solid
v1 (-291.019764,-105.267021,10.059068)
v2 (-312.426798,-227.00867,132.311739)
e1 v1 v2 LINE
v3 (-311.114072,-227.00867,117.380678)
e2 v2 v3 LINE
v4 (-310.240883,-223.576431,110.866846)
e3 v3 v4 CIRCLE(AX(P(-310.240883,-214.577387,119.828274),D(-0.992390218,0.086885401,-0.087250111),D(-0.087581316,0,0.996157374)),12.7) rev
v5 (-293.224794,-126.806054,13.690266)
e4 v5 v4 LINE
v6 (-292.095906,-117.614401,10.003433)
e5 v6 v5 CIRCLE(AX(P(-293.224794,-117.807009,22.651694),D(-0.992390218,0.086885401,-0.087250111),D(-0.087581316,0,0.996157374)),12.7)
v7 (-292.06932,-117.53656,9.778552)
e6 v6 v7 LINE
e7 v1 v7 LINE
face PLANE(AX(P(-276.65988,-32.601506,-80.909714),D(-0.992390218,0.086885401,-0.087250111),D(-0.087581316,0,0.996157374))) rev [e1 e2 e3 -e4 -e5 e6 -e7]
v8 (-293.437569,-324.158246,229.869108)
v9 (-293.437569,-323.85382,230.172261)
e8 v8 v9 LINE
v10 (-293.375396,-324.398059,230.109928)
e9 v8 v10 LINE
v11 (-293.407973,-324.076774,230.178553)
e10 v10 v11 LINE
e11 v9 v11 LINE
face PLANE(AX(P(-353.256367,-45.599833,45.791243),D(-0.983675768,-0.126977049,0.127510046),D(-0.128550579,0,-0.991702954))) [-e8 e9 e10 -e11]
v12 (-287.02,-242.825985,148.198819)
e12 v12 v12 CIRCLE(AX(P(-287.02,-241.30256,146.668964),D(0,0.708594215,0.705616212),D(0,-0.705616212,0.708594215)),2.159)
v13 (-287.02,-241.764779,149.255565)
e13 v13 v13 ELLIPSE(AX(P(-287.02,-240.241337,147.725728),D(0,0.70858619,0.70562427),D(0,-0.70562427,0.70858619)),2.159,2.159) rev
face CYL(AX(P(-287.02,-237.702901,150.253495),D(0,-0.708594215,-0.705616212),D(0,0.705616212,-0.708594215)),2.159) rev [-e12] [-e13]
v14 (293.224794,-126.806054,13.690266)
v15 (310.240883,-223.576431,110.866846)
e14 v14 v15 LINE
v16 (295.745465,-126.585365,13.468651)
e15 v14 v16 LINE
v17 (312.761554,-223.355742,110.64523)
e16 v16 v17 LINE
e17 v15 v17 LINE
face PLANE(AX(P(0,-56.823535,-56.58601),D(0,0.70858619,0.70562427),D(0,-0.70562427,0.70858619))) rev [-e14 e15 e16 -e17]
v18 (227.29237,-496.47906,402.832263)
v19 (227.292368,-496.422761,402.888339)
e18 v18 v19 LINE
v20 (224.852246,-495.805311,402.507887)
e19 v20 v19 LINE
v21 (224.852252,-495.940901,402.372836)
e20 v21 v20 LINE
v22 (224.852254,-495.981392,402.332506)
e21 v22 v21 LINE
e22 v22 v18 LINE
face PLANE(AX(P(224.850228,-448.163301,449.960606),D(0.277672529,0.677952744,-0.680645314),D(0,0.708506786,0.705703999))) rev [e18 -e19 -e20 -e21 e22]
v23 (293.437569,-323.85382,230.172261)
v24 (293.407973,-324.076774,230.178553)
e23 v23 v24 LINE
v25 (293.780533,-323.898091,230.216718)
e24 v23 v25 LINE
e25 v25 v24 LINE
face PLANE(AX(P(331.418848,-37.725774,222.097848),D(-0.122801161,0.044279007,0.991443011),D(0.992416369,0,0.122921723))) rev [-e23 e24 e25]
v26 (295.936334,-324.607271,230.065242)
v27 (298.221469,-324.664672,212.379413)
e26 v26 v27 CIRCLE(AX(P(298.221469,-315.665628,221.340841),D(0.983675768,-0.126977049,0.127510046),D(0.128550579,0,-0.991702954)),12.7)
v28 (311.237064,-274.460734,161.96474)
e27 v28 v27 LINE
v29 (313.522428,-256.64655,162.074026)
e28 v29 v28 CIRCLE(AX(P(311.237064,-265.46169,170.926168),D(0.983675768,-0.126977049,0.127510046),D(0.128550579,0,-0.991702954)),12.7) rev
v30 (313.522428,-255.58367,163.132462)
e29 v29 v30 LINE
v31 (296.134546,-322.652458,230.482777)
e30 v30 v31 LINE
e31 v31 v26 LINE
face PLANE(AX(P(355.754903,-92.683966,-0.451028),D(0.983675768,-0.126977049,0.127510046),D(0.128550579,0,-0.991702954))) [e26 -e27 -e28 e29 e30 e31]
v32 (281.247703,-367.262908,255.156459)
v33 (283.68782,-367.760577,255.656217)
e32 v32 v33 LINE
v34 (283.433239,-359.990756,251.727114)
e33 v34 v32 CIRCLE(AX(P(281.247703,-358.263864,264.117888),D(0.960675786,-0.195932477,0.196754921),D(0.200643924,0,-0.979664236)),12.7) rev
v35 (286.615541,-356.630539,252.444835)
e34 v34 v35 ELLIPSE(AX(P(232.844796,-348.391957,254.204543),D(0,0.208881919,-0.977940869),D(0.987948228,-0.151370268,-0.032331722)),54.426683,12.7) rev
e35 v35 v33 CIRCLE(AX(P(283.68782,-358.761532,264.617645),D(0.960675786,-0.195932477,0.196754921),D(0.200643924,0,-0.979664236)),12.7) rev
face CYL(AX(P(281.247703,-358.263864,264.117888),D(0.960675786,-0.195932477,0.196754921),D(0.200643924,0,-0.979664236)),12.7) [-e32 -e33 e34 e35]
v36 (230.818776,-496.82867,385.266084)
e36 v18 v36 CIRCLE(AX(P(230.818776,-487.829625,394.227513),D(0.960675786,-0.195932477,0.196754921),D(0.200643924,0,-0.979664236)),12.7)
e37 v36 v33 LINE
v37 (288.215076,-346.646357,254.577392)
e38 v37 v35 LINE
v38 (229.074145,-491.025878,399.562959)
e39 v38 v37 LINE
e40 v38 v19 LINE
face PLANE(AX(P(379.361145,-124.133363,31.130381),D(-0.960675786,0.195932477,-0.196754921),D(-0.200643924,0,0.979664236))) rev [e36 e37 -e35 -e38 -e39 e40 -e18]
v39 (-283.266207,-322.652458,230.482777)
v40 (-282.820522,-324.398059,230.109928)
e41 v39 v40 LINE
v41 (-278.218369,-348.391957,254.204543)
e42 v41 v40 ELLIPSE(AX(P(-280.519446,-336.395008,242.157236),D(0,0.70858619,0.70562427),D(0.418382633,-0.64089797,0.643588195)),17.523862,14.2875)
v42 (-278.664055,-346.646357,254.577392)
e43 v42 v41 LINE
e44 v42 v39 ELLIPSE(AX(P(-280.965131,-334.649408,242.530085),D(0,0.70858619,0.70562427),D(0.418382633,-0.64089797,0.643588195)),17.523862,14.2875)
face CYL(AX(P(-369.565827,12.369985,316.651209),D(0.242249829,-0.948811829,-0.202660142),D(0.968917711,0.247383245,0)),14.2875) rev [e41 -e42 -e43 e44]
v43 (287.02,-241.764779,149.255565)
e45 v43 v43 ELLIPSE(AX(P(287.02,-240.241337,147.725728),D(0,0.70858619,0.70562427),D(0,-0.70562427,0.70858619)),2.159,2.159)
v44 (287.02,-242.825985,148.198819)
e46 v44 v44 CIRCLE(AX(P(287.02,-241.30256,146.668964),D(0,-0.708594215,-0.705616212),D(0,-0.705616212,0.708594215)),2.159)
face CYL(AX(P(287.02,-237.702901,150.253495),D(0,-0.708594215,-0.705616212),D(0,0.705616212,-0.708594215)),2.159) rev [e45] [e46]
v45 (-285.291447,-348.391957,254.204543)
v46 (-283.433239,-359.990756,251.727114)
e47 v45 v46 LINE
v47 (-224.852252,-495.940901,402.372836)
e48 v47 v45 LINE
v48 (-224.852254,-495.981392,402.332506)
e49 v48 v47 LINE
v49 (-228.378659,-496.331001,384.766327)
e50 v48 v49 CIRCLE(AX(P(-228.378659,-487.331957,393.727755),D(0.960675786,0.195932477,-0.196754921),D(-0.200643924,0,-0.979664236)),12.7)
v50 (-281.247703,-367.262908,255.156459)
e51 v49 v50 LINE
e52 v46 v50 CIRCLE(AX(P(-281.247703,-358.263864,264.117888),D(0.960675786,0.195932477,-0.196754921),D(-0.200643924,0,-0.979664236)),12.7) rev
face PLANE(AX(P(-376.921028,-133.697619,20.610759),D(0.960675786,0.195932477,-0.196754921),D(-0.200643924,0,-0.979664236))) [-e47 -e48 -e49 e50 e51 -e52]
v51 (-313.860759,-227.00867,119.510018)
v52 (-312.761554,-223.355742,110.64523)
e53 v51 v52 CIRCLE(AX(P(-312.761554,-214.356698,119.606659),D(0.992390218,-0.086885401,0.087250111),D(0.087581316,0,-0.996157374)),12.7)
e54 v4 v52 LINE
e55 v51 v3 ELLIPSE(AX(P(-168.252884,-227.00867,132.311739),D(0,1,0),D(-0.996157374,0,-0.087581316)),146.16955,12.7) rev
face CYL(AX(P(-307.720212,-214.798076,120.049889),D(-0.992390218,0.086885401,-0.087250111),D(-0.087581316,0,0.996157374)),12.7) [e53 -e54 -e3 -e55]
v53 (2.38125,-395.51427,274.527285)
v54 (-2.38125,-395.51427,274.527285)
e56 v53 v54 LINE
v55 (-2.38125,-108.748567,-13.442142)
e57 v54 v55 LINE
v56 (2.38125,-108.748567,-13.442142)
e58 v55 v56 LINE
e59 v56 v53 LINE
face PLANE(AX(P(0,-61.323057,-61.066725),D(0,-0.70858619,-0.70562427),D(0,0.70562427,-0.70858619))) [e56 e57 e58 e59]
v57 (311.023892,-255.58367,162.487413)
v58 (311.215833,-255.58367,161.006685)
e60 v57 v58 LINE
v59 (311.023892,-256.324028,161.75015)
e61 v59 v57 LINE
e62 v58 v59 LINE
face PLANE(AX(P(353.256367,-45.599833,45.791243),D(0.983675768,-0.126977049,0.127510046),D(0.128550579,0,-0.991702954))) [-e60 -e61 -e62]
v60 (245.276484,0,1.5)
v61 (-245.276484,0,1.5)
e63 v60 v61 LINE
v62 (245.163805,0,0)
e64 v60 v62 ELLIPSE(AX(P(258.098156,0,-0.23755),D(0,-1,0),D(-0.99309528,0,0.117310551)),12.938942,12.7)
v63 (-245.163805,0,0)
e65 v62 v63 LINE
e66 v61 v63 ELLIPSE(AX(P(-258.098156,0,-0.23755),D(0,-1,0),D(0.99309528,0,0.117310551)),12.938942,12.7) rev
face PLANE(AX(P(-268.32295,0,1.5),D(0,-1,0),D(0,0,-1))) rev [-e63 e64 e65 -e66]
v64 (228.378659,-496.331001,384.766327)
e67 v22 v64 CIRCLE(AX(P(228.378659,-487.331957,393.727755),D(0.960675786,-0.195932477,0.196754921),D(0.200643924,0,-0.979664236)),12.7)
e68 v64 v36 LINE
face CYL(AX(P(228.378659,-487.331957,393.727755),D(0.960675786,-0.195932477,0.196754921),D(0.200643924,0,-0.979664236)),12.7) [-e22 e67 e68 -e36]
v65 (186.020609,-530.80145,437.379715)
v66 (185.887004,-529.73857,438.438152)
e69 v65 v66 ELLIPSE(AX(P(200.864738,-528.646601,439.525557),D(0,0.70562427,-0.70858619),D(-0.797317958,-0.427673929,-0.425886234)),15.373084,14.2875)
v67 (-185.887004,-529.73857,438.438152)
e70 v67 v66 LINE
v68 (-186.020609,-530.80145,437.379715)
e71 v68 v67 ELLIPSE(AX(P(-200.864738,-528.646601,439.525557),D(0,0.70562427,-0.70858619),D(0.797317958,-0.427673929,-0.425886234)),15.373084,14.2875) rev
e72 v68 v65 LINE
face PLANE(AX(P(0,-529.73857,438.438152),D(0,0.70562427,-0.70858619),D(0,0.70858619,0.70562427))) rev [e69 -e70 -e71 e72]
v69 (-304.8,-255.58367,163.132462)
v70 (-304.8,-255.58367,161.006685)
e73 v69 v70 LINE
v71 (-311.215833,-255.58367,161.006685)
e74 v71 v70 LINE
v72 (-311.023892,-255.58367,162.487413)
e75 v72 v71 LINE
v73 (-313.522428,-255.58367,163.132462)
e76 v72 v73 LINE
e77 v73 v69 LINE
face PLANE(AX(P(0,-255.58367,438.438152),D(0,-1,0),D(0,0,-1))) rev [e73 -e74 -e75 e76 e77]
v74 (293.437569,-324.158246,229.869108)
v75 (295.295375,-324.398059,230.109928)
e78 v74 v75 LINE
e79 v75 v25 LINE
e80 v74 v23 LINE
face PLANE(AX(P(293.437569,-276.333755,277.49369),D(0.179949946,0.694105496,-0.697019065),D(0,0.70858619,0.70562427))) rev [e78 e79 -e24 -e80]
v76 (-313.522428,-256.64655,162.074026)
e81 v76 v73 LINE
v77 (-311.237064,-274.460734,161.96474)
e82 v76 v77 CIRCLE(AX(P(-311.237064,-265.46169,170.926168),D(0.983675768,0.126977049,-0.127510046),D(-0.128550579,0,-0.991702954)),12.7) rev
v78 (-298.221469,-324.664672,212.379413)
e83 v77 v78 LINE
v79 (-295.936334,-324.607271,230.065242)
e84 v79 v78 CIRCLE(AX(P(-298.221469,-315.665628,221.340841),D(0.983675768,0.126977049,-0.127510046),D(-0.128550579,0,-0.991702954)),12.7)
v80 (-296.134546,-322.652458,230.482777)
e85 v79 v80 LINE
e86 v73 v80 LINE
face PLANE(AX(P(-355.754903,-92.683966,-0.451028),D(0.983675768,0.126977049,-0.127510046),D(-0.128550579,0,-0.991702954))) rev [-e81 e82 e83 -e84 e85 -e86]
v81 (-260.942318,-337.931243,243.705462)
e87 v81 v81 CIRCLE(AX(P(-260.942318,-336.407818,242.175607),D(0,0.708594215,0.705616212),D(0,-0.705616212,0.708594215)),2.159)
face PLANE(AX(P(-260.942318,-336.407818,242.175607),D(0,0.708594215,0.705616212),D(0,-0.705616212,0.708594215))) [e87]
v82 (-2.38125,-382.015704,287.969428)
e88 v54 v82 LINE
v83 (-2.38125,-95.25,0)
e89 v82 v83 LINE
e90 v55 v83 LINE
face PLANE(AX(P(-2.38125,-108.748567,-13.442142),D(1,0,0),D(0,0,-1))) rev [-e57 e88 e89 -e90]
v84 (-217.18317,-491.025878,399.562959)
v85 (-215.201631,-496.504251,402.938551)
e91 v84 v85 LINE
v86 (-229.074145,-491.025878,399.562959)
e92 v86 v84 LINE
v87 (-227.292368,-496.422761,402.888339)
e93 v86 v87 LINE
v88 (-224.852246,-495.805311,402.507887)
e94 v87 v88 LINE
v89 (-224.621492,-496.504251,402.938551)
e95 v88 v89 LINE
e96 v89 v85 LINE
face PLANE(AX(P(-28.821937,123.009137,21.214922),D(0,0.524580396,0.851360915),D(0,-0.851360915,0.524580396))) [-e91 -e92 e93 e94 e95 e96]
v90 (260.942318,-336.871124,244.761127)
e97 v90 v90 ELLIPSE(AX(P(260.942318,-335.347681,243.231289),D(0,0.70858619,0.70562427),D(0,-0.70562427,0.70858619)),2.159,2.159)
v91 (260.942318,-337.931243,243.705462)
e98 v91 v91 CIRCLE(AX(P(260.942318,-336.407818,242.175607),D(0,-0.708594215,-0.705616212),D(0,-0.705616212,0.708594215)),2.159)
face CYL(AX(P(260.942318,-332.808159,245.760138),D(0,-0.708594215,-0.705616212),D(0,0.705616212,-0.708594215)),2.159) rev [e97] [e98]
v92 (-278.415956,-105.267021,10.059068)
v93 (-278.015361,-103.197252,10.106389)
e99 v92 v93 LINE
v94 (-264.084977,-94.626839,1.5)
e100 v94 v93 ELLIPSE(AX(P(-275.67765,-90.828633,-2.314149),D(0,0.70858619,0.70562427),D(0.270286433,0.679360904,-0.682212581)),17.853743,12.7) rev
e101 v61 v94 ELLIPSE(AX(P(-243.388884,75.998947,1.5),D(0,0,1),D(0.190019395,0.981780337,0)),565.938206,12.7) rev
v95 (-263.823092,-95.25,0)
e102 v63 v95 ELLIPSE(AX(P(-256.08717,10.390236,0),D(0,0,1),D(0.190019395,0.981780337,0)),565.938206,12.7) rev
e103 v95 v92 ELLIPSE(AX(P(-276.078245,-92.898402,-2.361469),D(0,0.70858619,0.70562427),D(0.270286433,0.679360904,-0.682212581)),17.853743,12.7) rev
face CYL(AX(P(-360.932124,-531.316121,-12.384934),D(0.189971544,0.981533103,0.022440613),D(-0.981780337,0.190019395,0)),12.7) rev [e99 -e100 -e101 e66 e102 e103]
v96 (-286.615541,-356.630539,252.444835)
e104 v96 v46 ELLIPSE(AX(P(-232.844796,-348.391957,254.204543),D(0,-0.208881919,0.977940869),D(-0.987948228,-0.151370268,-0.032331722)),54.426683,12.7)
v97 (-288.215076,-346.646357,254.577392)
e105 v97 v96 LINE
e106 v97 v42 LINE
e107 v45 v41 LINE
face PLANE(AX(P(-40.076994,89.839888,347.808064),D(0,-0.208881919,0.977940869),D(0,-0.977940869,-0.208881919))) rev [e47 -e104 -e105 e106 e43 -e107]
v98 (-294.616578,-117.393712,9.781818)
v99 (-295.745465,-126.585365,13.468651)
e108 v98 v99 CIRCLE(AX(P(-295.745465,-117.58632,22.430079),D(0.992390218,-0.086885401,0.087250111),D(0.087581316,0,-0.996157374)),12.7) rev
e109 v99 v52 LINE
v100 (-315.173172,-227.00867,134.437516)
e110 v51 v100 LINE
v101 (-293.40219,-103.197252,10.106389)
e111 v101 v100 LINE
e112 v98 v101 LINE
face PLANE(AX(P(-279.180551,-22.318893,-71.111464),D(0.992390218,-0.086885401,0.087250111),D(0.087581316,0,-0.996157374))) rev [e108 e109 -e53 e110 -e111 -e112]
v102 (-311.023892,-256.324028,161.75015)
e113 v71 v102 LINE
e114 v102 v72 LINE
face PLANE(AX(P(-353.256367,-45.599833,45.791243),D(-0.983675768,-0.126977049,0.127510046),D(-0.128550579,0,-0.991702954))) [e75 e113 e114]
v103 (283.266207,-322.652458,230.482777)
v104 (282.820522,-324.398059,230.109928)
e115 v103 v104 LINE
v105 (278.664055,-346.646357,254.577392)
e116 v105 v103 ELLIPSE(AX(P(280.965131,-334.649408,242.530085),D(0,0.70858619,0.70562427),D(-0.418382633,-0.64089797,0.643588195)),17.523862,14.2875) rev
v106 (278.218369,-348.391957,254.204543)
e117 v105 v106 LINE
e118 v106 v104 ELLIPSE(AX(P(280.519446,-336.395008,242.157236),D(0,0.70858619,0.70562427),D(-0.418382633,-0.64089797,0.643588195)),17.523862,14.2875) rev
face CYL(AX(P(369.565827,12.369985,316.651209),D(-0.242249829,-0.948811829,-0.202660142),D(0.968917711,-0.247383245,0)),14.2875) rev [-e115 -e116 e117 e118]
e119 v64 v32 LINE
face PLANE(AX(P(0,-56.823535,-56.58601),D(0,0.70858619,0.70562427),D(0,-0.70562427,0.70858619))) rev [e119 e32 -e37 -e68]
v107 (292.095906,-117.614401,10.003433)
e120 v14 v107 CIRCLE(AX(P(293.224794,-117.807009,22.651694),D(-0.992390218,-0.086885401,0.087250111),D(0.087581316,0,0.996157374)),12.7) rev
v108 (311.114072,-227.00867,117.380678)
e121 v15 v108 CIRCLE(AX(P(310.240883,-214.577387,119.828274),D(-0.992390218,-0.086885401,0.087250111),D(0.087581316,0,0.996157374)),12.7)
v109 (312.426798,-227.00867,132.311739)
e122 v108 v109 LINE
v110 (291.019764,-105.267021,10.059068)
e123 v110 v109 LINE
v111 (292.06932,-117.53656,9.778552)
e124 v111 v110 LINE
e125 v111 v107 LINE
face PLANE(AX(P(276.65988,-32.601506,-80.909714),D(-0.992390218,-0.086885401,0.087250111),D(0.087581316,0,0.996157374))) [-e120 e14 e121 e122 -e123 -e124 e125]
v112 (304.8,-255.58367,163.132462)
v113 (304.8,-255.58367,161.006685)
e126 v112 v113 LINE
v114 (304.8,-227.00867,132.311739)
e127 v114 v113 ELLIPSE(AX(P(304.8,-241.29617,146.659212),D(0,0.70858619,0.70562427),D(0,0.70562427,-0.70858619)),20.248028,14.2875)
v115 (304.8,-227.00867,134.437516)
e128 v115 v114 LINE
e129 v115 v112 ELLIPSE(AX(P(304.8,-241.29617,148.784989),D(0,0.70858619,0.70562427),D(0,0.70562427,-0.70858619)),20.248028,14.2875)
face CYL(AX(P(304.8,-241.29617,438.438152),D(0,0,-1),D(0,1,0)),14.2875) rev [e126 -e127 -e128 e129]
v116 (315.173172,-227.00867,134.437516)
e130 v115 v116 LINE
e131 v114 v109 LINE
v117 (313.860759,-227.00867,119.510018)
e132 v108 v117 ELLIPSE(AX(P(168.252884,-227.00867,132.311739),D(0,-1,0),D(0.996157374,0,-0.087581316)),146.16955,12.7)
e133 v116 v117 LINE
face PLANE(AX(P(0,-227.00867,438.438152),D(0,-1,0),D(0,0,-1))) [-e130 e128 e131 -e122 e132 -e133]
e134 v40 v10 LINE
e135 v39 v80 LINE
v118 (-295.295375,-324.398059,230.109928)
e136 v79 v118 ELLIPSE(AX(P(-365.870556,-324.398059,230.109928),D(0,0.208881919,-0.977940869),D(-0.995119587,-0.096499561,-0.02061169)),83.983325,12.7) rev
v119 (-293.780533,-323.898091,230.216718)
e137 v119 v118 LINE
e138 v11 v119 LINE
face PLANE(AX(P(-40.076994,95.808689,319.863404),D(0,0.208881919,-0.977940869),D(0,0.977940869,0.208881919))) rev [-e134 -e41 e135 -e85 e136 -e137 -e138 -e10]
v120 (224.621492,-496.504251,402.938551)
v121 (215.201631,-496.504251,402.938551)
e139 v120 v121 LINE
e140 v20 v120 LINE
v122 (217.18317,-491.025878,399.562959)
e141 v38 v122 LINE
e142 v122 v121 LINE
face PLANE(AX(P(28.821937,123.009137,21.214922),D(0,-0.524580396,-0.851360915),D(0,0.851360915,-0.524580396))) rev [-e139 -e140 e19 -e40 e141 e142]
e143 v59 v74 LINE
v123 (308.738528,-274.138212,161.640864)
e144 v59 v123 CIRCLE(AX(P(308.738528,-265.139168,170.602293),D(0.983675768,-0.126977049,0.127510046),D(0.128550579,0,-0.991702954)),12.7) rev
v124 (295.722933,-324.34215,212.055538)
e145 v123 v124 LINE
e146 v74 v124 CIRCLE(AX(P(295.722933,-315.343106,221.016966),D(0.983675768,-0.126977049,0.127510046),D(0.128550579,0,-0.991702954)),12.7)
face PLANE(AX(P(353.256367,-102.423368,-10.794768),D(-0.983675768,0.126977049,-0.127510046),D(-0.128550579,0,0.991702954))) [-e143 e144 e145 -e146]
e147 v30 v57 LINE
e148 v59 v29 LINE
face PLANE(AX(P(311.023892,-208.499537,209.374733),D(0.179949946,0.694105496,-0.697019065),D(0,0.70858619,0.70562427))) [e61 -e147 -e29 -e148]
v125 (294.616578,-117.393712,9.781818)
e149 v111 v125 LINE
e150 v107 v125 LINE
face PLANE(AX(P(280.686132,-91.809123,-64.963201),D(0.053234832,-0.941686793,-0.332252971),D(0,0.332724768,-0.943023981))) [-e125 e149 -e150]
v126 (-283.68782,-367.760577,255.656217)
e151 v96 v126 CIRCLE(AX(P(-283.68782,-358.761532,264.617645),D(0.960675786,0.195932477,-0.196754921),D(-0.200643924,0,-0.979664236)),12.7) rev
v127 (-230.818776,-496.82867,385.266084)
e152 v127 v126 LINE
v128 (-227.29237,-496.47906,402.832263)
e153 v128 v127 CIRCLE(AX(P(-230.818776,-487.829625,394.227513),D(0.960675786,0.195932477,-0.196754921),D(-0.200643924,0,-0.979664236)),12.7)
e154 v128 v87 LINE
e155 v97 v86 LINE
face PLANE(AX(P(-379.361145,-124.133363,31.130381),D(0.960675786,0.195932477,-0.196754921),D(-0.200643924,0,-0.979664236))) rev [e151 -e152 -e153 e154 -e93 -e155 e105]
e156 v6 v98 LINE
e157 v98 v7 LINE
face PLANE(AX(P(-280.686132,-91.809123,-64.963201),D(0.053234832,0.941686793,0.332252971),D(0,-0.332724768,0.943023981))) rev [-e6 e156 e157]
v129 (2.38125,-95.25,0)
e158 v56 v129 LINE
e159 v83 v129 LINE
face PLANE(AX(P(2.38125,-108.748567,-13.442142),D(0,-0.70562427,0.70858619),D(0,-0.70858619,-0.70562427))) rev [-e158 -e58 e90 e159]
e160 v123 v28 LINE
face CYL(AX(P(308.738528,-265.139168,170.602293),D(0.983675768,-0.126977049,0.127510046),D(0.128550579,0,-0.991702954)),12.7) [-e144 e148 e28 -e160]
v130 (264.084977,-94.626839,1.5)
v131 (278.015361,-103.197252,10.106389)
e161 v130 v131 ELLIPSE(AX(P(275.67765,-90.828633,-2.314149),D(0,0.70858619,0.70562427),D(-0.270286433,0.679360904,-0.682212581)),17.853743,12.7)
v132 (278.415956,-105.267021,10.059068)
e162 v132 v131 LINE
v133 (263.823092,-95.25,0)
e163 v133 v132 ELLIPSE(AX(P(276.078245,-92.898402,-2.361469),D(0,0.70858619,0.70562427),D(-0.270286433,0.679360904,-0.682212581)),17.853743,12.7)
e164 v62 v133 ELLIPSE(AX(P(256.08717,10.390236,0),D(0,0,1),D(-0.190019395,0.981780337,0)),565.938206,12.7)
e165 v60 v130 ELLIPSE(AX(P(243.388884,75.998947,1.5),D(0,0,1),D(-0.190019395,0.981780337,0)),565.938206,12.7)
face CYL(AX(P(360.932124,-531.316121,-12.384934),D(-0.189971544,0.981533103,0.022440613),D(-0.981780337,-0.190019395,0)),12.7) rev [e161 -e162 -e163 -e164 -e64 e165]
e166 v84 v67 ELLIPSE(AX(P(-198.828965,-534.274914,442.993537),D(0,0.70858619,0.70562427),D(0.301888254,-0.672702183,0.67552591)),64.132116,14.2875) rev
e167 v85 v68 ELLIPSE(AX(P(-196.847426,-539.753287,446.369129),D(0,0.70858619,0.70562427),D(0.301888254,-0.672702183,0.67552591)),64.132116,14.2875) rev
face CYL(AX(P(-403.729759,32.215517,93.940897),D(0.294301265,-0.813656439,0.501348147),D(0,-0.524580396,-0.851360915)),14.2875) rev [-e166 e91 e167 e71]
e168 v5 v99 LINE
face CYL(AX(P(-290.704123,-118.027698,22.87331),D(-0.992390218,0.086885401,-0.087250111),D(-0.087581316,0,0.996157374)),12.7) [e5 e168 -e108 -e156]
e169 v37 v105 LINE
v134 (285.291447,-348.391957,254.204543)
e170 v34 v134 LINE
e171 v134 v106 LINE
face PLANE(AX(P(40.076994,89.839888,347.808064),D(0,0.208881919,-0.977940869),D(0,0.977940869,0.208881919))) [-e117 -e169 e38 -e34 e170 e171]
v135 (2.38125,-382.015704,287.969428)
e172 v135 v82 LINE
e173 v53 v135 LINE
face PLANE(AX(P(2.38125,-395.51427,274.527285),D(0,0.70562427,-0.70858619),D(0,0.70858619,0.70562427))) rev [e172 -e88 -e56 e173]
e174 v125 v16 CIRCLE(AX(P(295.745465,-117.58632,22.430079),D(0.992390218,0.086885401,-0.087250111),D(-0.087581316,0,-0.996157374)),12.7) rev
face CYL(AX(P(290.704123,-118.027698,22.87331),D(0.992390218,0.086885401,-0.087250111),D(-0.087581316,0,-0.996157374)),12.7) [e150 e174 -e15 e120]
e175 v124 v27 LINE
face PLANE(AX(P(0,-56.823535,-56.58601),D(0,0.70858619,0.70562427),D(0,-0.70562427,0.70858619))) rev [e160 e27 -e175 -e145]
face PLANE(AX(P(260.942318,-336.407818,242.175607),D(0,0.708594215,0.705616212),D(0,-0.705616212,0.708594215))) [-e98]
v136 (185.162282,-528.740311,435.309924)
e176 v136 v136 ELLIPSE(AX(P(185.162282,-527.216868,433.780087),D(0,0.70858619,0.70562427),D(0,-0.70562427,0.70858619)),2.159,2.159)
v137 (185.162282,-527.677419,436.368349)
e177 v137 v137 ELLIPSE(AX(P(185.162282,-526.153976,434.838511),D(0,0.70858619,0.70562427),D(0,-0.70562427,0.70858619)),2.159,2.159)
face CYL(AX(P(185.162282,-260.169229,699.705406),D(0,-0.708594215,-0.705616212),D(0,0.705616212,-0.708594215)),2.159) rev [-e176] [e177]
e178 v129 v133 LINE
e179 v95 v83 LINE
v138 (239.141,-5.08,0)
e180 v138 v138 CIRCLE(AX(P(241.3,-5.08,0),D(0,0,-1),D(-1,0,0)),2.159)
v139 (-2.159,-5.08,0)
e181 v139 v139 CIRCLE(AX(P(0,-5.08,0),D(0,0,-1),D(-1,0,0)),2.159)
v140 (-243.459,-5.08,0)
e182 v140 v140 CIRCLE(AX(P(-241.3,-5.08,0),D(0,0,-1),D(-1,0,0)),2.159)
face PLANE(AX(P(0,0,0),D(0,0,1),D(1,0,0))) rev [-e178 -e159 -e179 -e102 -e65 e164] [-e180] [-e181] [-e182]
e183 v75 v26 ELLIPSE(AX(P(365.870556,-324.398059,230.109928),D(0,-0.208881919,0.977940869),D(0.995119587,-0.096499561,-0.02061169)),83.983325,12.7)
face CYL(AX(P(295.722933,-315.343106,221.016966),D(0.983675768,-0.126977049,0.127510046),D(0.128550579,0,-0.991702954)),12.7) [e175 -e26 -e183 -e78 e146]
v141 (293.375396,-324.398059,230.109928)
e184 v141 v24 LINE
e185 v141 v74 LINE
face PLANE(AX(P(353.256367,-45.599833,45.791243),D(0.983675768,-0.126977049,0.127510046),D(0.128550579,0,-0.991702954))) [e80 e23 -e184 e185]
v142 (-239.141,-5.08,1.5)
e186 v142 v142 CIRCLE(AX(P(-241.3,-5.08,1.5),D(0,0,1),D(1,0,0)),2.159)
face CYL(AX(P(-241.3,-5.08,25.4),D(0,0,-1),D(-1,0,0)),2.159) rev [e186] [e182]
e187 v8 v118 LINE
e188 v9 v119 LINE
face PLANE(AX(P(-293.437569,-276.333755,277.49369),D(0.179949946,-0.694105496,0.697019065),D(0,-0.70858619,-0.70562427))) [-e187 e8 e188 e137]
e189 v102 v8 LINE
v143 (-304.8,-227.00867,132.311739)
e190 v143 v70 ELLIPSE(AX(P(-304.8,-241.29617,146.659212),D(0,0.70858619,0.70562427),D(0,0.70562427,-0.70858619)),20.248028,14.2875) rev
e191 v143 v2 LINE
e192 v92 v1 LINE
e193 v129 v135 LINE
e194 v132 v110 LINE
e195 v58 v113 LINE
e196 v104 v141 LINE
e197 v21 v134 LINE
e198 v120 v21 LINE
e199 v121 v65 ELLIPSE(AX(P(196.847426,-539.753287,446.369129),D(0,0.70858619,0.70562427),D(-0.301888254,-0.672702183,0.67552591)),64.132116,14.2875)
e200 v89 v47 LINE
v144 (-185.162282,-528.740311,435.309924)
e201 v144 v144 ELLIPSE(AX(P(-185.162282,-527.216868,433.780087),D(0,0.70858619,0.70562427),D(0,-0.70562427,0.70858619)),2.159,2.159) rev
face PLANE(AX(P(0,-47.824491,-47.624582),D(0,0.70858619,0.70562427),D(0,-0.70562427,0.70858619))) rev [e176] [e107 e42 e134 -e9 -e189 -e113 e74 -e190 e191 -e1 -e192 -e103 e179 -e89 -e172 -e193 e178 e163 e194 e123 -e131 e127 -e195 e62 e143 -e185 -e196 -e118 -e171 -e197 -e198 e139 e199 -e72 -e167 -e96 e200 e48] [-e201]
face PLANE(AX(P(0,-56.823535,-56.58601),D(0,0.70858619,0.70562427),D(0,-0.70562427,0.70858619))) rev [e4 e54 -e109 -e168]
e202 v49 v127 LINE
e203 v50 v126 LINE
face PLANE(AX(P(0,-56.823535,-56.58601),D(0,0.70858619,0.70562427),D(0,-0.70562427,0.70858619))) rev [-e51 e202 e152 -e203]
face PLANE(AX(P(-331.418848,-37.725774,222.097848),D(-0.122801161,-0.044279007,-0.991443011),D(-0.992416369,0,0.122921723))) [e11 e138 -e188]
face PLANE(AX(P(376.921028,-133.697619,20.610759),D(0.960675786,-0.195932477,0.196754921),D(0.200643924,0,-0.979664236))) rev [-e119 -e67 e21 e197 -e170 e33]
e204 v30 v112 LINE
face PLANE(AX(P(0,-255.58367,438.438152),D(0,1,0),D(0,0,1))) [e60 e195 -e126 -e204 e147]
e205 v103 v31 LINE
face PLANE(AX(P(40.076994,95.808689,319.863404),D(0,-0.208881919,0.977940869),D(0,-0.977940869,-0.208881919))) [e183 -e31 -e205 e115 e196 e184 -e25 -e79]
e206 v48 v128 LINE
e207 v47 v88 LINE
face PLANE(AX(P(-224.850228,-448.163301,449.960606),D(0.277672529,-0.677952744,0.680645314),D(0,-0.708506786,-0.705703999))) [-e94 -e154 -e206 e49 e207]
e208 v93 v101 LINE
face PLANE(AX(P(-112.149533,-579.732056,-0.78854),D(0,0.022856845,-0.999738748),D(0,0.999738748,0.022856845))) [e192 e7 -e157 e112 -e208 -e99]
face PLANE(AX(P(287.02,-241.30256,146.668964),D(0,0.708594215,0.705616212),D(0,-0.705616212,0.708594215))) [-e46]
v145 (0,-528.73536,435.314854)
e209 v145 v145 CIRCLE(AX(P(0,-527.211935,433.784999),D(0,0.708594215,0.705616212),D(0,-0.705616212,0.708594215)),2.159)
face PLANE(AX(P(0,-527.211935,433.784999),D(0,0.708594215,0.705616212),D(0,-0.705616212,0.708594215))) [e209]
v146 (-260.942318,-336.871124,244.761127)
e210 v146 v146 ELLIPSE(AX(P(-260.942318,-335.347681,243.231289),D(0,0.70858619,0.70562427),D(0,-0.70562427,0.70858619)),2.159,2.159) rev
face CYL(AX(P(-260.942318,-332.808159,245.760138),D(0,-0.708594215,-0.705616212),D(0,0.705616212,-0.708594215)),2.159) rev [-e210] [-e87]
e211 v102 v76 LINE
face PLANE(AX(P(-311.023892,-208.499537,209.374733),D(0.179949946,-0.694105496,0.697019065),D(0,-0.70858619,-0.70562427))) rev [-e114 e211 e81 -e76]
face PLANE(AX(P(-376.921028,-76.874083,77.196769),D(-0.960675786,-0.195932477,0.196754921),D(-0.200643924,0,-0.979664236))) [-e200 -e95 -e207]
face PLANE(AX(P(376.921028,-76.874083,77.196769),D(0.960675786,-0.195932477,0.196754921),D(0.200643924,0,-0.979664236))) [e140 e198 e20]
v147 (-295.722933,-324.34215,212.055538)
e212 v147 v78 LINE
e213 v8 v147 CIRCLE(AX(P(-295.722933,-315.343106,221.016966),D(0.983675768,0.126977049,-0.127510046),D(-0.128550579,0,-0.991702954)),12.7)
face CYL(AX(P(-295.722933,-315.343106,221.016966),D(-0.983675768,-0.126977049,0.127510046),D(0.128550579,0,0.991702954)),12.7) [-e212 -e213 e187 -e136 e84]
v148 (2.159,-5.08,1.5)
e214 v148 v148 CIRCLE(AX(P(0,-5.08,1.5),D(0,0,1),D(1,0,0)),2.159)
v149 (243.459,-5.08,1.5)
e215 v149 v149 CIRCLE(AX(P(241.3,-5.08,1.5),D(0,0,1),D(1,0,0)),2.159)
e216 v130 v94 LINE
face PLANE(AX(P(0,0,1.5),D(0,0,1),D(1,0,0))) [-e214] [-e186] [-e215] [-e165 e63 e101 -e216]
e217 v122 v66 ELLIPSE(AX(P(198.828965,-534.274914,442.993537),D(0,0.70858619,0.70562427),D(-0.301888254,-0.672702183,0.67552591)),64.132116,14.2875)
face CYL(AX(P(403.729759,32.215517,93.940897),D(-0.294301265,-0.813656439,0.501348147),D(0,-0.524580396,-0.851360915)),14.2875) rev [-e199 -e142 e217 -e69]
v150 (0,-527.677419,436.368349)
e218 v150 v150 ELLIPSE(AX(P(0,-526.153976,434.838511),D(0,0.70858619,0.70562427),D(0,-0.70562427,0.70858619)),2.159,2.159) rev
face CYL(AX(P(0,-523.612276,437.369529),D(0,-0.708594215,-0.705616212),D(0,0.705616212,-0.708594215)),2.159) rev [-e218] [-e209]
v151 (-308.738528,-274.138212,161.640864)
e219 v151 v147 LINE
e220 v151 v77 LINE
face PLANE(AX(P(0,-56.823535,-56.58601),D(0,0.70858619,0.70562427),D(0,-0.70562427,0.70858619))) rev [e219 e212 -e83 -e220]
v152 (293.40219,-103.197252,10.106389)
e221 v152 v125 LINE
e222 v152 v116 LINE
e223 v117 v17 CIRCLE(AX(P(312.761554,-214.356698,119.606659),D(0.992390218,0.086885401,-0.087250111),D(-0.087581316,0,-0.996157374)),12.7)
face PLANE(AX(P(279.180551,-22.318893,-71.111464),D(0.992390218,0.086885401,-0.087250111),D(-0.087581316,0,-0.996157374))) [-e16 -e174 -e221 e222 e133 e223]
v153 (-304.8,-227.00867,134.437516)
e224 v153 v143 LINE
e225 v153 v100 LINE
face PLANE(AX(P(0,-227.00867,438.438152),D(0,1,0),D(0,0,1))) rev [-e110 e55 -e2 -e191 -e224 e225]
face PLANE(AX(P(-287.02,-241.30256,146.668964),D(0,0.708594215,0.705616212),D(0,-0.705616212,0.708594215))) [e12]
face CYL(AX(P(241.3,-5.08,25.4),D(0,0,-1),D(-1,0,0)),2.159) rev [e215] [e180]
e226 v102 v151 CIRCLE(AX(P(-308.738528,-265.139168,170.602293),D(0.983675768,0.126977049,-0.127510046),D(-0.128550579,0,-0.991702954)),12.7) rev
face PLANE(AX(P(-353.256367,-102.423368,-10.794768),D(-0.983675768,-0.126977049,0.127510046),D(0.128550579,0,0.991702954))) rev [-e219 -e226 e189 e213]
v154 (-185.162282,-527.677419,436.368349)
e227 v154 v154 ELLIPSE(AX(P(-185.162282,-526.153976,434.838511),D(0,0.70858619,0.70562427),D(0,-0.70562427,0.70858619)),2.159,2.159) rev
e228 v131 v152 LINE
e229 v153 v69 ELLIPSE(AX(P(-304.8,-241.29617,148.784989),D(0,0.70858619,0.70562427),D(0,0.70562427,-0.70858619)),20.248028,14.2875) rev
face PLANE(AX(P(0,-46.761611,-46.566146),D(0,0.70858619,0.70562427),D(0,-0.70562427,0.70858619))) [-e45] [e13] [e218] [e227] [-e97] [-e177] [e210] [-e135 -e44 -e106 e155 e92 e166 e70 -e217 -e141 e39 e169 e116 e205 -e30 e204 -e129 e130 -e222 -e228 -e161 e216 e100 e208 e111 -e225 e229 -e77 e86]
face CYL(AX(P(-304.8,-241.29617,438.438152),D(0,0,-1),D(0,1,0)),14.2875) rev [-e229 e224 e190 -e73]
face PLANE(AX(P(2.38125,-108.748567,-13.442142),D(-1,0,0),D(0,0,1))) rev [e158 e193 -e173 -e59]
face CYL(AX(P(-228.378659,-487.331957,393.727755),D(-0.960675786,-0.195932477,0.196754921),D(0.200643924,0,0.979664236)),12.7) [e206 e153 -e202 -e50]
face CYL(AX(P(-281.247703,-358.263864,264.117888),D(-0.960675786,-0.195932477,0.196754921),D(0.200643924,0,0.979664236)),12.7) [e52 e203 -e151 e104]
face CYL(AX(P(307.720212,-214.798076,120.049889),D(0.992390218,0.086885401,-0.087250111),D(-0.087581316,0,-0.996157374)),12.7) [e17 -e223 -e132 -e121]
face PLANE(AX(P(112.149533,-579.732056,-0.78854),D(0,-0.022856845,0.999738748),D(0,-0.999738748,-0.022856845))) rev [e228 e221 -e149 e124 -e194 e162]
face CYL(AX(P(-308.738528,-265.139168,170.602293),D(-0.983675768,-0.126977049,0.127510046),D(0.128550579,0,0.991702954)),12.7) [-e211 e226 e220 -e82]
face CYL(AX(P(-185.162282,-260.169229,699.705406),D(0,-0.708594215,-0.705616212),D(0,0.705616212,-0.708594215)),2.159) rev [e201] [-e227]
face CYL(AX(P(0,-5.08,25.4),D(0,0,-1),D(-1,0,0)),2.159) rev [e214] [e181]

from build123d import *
from build123d.topology import SkipClean

# Parameters (mm, degrees)
UPPER_DEPTH         = 1.5
LOWER_DEPTH         = 1.5
BOSS_EXTRUDE1_DEPTH = 12.7
SKETCH3_R           = 2.159
CUT_EXTRUDE3_DEPTH  = 25.4
SKETCH21_R          = 14.2875
CUT_EXTRUDE28_DEPTH = 874.615346647
SKETCH8_R           = 12.7
CUT_EXTRUDE9_DEPTH  = 909.841508723
SKETCH7_R           = 14.2875
CUT_EXTRUDE10_DEPTH = 768.787550437
SKETCH6_R           = 14.2875
CUT_EXTRUDE11_DEPTH = 805.372191991
CUT_EXTRUDE13_DEPTH = 5.08
CUT_EXTRUDE16_DEPTH = 2.54
CUT_EXTRUDE22_DEPTH = 2.54
SKETCH20_R          = 2.159
CUT_EXTRUDE25_DEPTH = 5.08
SKETCH19_R          = 2.159
CUT_EXTRUDE26_DEPTH = 5.08
SKETCH18_R          = 2.159
CUT_EXTRUDE27_DEPTH = 5.08
SKETCH23_R          = 2.159
CUT_EXTRUDE29_DEPTH = 755.225962057
SKETCH24_W          = 4.7625
SKETCH24_H          = 406.4
BOSS_EXTRUDE2_DEPTH = 19.05


# Read off the part's stored shape, not the designer's step: Mirror1
with BuildPart() as part:
    # Sketch1 → Upper (new body)
    with BuildSketch(Plane.XY):
        Polygon((-268.322950018, 0), (268.322950018, 0), (291.817849942, -95.25), (-291.817849942, -95.25), align=None)
    extrude(amount=UPPER_DEPTH)

    # Sketch2 → Lower (add)
    with BuildSketch(Plane(origin=(0, -47.82449055, -47.624582187), x_dir=(1, 0, 0), z_dir=(0, 0.7085861902250874, 0.7056242704317195))):
        Polygon((-292.843249974, -408.979811759), (-213.216599982, -684.467611759), (-211.306786287, -681.927611759), (-290.367685881, -408.397163128), (-314.93135919, -274.122656346), (-289.573528128, -69.750711759), (-291.817849942, -67.210711759), (-317.5, -274.196511759), align=None)
        Polygon((-213.216599982, -684.467611759), (-211.306786287, -681.927611759), (-290.367685881, -408.397163128), (-314.93135919, -274.122656346), (-289.573528128, -69.750711759), (-291.817849942, -67.210711759), (291.817849942, -67.210711759), (289.573528128, -69.750711759), (314.93135919, -274.122656346), (290.367685881, -408.397163128), (211.306786287, -681.927611759), (213.216599982, -684.467611759), align=None)
        Polygon((213.216599982, -684.467611759), (211.306786287, -681.927611759), (290.367685881, -408.397163128), (314.93135919, -274.122656346), (289.573528128, -69.750711759), (291.817849942, -67.210711759), (317.5, -274.196511759), (292.843249974, -408.979811759), align=None)
    extrude(amount=LOWER_DEPTH)

    # Sketch2<3> → Boss-Extrude1 (add)
    with BuildSketch(Plane(origin=(0, -47.82449055, -47.624582187), x_dir=(1, 0, 0), z_dir=(0, 0.7085861902250874, 0.7056242704317195))):
        Polygon((213.216599982, -684.467611759), (211.306786287, -681.927611759), (290.367685881, -408.397163128), (314.93135919, -274.122656346), (289.573528128, -69.750711759), (291.817849942, -67.210711759), (317.5, -274.196511759), (292.843249974, -408.979811759), align=None)
    extrude(amount=-BOSS_EXTRUDE1_DEPTH)

    # Sketch3 → Cut-Extrude3 (cut)
    with BuildSketch(Plane(origin=(0, 0, 0), x_dir=(-1, 0, 0), z_dir=(0, 0, -1))):
        with Locations((-241.3, -5.08)):
            Circle(SKETCH3_R)
        with Locations((0, -5.08)):
            Circle(SKETCH3_R)
        with Locations((241.3, -5.08)):
            Circle(SKETCH3_R)
    extrude(amount=-CUT_EXTRUDE3_DEPTH, mode=Mode.SUBTRACT)

    # Sketch21 → Cut-Extrude28 (cut, through all)
    with BuildSketch(Plane(origin=(196.85, -539.746170446, 446.36474374), x_dir=(-0.9557127001633002, 0.25055659462572005, -0.15438467422686922), z_dir=(-0.29430126528197925, -0.8136564393089987, 0.5013481465253741))):
        with BuildLine():
            ThreePointArc((0, -14.2875), (-14.2875, 0), (0, 14.2875))
            Line((0, 14.2875), (-38.1, 14.2875))
            Line((-38.1, 14.2875), (-38.1, -14.2875))
            Line((-38.1, -14.2875), (0, -14.2875))
        make_face()
        Circle(SKETCH21_R)
    extrude(amount=-CUT_EXTRUDE28_DEPTH, mode=Mode.SUBTRACT)

    # Sketch8 → Cut-Extrude9 (cut, through all)
    with BuildSketch(Plane(origin=(255.6256, 12.775047317, 0.0545235), x_dir=(0.9817895969366798, 0.189921913110119, 0.004342150101546657), z_dir=(-0.18997154351879111, 0.9815331026321988, 0.022440612520550327))):
        Circle(SKETCH8_R)
        with BuildLine():
            ThreePointArc((12.7, 0), (8.980256121, -8.980256121), (0, -12.7))
            Line((0, -12.7), (50.8, -12.7))
            Line((50.8, -12.7), (50.8, 12.7))
            Line((50.8, 12.7), (0, 12.7))
            ThreePointArc((0, 12.7), (8.980256121, 8.980256121), (12.7, 0))
        make_face()
    extrude(amount=-CUT_EXTRUDE9_DEPTH, mode=Mode.SUBTRACT)

    # Sketch7 → Cut-Extrude10 (cut, symmetric)
    with BuildSketch(Plane(origin=(0, 0, -5.754260468), x_dir=(-1, 0, 0), z_dir=(0, 0, -1))):
        with Locations((-304.8, -241.296170446)):
            Circle(SKETCH7_R)
        with BuildLine():
            Line((-355.6, -255.583670446), (-304.8, -255.583670446))
            ThreePointArc((-304.8, -255.583670446), (-319.0875, -241.296170446), (-304.8, -227.008670446))
            Line((-304.8, -227.008670446), (-355.6, -227.008670446))
            Line((-355.6, -227.008670446), (-355.6, -255.583670446))
        make_face()
    extrude(amount=CUT_EXTRUDE10_DEPTH, both=True, mode=Mode.SUBTRACT)

    # Sketch6 → Cut-Extrude11 (cut, through all)
    with BuildSketch(Plane(origin=(228.6, -539.746170446, 198.722727079), x_dir=(0.9702139044987836, -0.23690600809094062, -0.050601609140820056), z_dir=(0.2422498287248624, 0.948811829172378, 0.202660142369784))):
        Circle(SKETCH6_R)
        with BuildLine():
            ThreePointArc((14.2875, 0), (10.102788136, -10.102788136), (0, -14.2875))
            Line((0, -14.2875), (50.8, -14.2875))
            Line((50.8, -14.2875), (50.8, 14.2875))
            Line((50.8, 14.2875), (0, 14.2875))
            ThreePointArc((0, 14.2875), (10.102788136, 10.102788136), (14.2875, 0))
        make_face()
    extrude(amount=CUT_EXTRUDE11_DEPTH, mode=Mode.SUBTRACT)

    # Sketch12 → Cut-Extrude13 (cut)
    with BuildSketch(Plane(origin=(279.180551252, 24.44271802, -24.545318473), x_dir=(-0.0869176220205297, -0.007609781256081438, -0.9961864374762041), z_dir=(0.9923902182248356, 0.08688540143887281, -0.0872501105355694))):
        with BuildLine():
            ThreePointArc((-34.458545921, -142.642226363), (-35.363095323, -147.648027336), (-38.159492817, -151.897311282))
            Line((-38.159492817, -151.897311282), (-34.334674949, -148.059274691))
            Line((-34.334674949, -148.059274691), (-34.458545921, -142.642226363))
        make_face()
        with BuildLine():
            ThreePointArc((-135.708080175, -249.783030443), (-139.788854201, -252.528666144), (-144.606803116, -253.517908429))
            Line((-144.606803116, -253.517908429), (-139.390384316, -253.478060774))
            Line((-139.390384316, -253.478060774), (-135.708080175, -249.783030443))
        make_face()
        Polygon((-34.458545921, -142.642226363), (-34.334674949, -148.059274691), (-33.456000975, -142.287544019), align=None)
    extrude(amount=-CUT_EXTRUDE13_DEPTH, mode=Mode.SUBTRACT)


with BuildPart() as body_2:
    # of the pieces the cut leaves, the one that is kept (cut_extrude13_keep)
    add(part.part.solids().sort_by_distance((-268.322950018, 0, 0))[0])

    # Sketch9 → Cut-Extrude16 (cut)
    with BuildSketch(Plane(origin=(379.361144518, -77.371751981, 77.696526699), x_dir=(0.19278613597149513, -0.03931926427703094, -0.9804527021911323), z_dir=(0.9606757859804161, -0.19593247679954207, 0.19675492056390054))):
        with BuildLine():
            Line((-176.807332276, -298.778278327), (-178.232267114, -292.159968301))
            ThreePointArc((-178.232267114, -292.159968301), (-178.434275143, -298.314516716), (-181.507674694, -303.650572247))
            Line((-181.507674694, -303.650572247), (-176.807332276, -298.778278327))
        make_face()
        with BuildLine():
            Line((-331.617972049, -441.042646452), (-332.474146327, -440.216866681))
            Line((-332.474146327, -440.216866681), (-322.519098896, -449.820583633))
            Line((-322.519098896, -449.820583633), (-313.701575889, -440.680491291))
            ThreePointArc((-313.701575889, -440.680491291), (-322.58500773, -444.56037453), (-331.617972049, -441.042646452))
        make_face()
        Polygon((-322.519098896, -449.820583633), (-332.474146327, -440.216866681), (-335.674588136, -441.430740469), (-359.267836197, -484.804221539), (-357.714104356, -486.303119554), align=None)
    extrude(amount=-CUT_EXTRUDE16_DEPTH, mode=Mode.SUBTRACT)

    # Sketch10 → Cut-Extrude22 (cut)
    with BuildSketch(Plane(origin=(355.754903335, -45.922355027, 46.115118142), x_dir=(0.12646080723028635, -0.01632409850759065, -0.9918372790143446), z_dir=(0.9836757682395201, -0.12697704918987876, 0.12751004649603565))):
        with BuildLine():
            ThreePointArc((-116.91323791, -214.396901236), (-113.138471271, -223.354168193), (-116.803052388, -232.357075488))
            Line((-116.803052388, -232.357075488), (-97.690742096, -213.008809877))
            Line((-97.690742096, -213.008809877), (-117.980385141, -213.342768044))
            Line((-117.980385141, -213.342768044), (-116.91323791, -214.396901236))
        make_face()
        with BuildLine():
            ThreePointArc((-167.632633505, -283.814184614), (-176.500013499, -287.588081665), (-185.464014694, -284.04980391))
            Line((-185.464014694, -284.04980391), (-182.326299222, -298.68925428))
            Line((-182.326299222, -298.68925428), (-167.632633505, -283.814184614))
        make_face()
        with BuildLine():
            ThreePointArc((-185.464014694, -284.04980391), (-185.528633184, -283.987314925), (-185.592807757, -283.924370136))
            Line((-185.592807757, -283.924370136), (-185.898455633, -283.622449687))
            Line((-185.898455633, -283.622449687), (-186.418418258, -302.057831208))
            Line((-186.418418258, -302.057831208), (-176.55762787, -302.057831208))
            Line((-176.55762787, -302.057831208), (-167.632633505, -283.814184614))
            Line((-167.632633505, -283.814184614), (-182.326299222, -298.68925428))
            Line((-182.326299222, -298.68925428), (-185.464014694, -284.04980391))
        make_face()
    extrude(amount=-CUT_EXTRUDE22_DEPTH, mode=Mode.SUBTRACT)

    # Mirror1
    split(bisect_by=Plane(origin=(0, 0, 0), x_dir=(0, 0, 1), z_dir=(1, 0, 0)), keep=Keep.TOP)

    # Mirror1 2: body 2 across plane


with BuildPart() as body_2_1:
    with SkipClean():  # the faces are left unmerged after this step: merging them gives an invalid solid
        add(body_2.part)
        add(body_2.part.mirror(Plane(origin=(0, 0, 0), x_dir=(0, 0, 1), z_dir=(1, 0, 0))))

    # Sketch20 → Cut-Extrude25 (cut)
    with SkipClean():  # the faces are left unmerged after this step: merging them gives an invalid solid
        with BuildSketch(Plane(origin=(0, -47.82557375, -47.624577646), x_dir=(1, 0, 0), z_dir=(1.6140263867400147e-15, 0.7085942146752751, 0.7056162122065581))):
            with Locations(Location((0, -679.386829065, 0), (0, 0, 269.999999992))):
                Circle(SKETCH20_R)
        cut_extrude25 = extrude(amount=CUT_EXTRUDE25_DEPTH, mode=Mode.SUBTRACT)

    # Sketch19 → Cut-Extrude26 (cut)
    with SkipClean():  # the faces are left unmerged after this step: merging them gives an invalid solid
        with BuildSketch(Plane(origin=(0, -47.82557375, -47.624577646), x_dir=(1, 0, 0), z_dir=(1.6417819623556435e-15, 0.7085942146752751, 0.7056162122065581))):
            with Locations(Location((-260.942318198, -408.979044635, 0), (0, 0, 269.999999991))):
                Circle(SKETCH19_R)
        cut_extrude26 = extrude(amount=CUT_EXTRUDE26_DEPTH, mode=Mode.SUBTRACT)

    # Sketch18 → Cut-Extrude27 (cut)
    with SkipClean():  # the faces are left unmerged after this step: merging them gives an invalid solid
        with BuildSketch(Plane(origin=(0, -47.82557375, -47.624577646), x_dir=(1, 0, 0), z_dir=(1.6972931135869015e-15, 0.7085942146752751, 0.7056162122065581))):
            with Locations(Location((-287.02, -274.195777815, 0), (0, 0, 269.999999991))):
                Circle(SKETCH18_R)
        cut_extrude27 = extrude(amount=CUT_EXTRUDE27_DEPTH, mode=Mode.SUBTRACT)

    # Sketch23 → Cut-Extrude29 (cut, symmetric)
    with SkipClean():  # the faces are left unmerged after this step: merging them gives an invalid solid
        with BuildSketch(Plane(origin=(0, -47.82557375, -47.624577646), x_dir=(1, 0, 0), z_dir=(1.7528042648181593e-15, 0.708594214675275, 0.7056162122065582))):
            with Locations(Location((-185.162281701, -679.386829065, 0), (0, 0, 269.999999991))):
                Circle(SKETCH23_R)
        cut_extrude29 = extrude(amount=CUT_EXTRUDE29_DEPTH, both=True, mode=Mode.SUBTRACT)

    # Mirror2: Cut-Extrude25, Cut-Extrude26, Cut-Extrude27, Cut-Extrude29 across plane
    with SkipClean():  # the faces are left unmerged after this step: merging them gives an invalid solid
        add(cut_extrude25.mirror(Plane(origin=(0, 0, 0), x_dir=(0, 0, 1), z_dir=(1, 0, 0))), mode=Mode.SUBTRACT)
        add(cut_extrude26.mirror(Plane(origin=(0, 0, 0), x_dir=(0, 0, 1), z_dir=(1, 0, 0))), mode=Mode.SUBTRACT)
        add(cut_extrude27.mirror(Plane(origin=(0, 0, 0), x_dir=(0, 0, 1), z_dir=(1, 0, 0))), mode=Mode.SUBTRACT)
        add(cut_extrude29.mirror(Plane(origin=(0, 0, 0), x_dir=(0, 0, 1), z_dir=(1, 0, 0))), mode=Mode.SUBTRACT)

    # Sketch24 → Boss-Extrude2 (add)
    with SkipClean():  # the faces are left unmerged after this step: merging them gives an invalid solid
        with BuildSketch(Plane(origin=(0, -47.82449055, -47.624582187), x_dir=(1, 0, 0), z_dir=(0, -0.7085861902250873, -0.7056242704317196))):
            with Locations((0, 270.410711759)):
                Rectangle(SKETCH24_W, SKETCH24_H)
        extrude(amount=BOSS_EXTRUDE2_DEPTH)


solid = body_2_1.part
